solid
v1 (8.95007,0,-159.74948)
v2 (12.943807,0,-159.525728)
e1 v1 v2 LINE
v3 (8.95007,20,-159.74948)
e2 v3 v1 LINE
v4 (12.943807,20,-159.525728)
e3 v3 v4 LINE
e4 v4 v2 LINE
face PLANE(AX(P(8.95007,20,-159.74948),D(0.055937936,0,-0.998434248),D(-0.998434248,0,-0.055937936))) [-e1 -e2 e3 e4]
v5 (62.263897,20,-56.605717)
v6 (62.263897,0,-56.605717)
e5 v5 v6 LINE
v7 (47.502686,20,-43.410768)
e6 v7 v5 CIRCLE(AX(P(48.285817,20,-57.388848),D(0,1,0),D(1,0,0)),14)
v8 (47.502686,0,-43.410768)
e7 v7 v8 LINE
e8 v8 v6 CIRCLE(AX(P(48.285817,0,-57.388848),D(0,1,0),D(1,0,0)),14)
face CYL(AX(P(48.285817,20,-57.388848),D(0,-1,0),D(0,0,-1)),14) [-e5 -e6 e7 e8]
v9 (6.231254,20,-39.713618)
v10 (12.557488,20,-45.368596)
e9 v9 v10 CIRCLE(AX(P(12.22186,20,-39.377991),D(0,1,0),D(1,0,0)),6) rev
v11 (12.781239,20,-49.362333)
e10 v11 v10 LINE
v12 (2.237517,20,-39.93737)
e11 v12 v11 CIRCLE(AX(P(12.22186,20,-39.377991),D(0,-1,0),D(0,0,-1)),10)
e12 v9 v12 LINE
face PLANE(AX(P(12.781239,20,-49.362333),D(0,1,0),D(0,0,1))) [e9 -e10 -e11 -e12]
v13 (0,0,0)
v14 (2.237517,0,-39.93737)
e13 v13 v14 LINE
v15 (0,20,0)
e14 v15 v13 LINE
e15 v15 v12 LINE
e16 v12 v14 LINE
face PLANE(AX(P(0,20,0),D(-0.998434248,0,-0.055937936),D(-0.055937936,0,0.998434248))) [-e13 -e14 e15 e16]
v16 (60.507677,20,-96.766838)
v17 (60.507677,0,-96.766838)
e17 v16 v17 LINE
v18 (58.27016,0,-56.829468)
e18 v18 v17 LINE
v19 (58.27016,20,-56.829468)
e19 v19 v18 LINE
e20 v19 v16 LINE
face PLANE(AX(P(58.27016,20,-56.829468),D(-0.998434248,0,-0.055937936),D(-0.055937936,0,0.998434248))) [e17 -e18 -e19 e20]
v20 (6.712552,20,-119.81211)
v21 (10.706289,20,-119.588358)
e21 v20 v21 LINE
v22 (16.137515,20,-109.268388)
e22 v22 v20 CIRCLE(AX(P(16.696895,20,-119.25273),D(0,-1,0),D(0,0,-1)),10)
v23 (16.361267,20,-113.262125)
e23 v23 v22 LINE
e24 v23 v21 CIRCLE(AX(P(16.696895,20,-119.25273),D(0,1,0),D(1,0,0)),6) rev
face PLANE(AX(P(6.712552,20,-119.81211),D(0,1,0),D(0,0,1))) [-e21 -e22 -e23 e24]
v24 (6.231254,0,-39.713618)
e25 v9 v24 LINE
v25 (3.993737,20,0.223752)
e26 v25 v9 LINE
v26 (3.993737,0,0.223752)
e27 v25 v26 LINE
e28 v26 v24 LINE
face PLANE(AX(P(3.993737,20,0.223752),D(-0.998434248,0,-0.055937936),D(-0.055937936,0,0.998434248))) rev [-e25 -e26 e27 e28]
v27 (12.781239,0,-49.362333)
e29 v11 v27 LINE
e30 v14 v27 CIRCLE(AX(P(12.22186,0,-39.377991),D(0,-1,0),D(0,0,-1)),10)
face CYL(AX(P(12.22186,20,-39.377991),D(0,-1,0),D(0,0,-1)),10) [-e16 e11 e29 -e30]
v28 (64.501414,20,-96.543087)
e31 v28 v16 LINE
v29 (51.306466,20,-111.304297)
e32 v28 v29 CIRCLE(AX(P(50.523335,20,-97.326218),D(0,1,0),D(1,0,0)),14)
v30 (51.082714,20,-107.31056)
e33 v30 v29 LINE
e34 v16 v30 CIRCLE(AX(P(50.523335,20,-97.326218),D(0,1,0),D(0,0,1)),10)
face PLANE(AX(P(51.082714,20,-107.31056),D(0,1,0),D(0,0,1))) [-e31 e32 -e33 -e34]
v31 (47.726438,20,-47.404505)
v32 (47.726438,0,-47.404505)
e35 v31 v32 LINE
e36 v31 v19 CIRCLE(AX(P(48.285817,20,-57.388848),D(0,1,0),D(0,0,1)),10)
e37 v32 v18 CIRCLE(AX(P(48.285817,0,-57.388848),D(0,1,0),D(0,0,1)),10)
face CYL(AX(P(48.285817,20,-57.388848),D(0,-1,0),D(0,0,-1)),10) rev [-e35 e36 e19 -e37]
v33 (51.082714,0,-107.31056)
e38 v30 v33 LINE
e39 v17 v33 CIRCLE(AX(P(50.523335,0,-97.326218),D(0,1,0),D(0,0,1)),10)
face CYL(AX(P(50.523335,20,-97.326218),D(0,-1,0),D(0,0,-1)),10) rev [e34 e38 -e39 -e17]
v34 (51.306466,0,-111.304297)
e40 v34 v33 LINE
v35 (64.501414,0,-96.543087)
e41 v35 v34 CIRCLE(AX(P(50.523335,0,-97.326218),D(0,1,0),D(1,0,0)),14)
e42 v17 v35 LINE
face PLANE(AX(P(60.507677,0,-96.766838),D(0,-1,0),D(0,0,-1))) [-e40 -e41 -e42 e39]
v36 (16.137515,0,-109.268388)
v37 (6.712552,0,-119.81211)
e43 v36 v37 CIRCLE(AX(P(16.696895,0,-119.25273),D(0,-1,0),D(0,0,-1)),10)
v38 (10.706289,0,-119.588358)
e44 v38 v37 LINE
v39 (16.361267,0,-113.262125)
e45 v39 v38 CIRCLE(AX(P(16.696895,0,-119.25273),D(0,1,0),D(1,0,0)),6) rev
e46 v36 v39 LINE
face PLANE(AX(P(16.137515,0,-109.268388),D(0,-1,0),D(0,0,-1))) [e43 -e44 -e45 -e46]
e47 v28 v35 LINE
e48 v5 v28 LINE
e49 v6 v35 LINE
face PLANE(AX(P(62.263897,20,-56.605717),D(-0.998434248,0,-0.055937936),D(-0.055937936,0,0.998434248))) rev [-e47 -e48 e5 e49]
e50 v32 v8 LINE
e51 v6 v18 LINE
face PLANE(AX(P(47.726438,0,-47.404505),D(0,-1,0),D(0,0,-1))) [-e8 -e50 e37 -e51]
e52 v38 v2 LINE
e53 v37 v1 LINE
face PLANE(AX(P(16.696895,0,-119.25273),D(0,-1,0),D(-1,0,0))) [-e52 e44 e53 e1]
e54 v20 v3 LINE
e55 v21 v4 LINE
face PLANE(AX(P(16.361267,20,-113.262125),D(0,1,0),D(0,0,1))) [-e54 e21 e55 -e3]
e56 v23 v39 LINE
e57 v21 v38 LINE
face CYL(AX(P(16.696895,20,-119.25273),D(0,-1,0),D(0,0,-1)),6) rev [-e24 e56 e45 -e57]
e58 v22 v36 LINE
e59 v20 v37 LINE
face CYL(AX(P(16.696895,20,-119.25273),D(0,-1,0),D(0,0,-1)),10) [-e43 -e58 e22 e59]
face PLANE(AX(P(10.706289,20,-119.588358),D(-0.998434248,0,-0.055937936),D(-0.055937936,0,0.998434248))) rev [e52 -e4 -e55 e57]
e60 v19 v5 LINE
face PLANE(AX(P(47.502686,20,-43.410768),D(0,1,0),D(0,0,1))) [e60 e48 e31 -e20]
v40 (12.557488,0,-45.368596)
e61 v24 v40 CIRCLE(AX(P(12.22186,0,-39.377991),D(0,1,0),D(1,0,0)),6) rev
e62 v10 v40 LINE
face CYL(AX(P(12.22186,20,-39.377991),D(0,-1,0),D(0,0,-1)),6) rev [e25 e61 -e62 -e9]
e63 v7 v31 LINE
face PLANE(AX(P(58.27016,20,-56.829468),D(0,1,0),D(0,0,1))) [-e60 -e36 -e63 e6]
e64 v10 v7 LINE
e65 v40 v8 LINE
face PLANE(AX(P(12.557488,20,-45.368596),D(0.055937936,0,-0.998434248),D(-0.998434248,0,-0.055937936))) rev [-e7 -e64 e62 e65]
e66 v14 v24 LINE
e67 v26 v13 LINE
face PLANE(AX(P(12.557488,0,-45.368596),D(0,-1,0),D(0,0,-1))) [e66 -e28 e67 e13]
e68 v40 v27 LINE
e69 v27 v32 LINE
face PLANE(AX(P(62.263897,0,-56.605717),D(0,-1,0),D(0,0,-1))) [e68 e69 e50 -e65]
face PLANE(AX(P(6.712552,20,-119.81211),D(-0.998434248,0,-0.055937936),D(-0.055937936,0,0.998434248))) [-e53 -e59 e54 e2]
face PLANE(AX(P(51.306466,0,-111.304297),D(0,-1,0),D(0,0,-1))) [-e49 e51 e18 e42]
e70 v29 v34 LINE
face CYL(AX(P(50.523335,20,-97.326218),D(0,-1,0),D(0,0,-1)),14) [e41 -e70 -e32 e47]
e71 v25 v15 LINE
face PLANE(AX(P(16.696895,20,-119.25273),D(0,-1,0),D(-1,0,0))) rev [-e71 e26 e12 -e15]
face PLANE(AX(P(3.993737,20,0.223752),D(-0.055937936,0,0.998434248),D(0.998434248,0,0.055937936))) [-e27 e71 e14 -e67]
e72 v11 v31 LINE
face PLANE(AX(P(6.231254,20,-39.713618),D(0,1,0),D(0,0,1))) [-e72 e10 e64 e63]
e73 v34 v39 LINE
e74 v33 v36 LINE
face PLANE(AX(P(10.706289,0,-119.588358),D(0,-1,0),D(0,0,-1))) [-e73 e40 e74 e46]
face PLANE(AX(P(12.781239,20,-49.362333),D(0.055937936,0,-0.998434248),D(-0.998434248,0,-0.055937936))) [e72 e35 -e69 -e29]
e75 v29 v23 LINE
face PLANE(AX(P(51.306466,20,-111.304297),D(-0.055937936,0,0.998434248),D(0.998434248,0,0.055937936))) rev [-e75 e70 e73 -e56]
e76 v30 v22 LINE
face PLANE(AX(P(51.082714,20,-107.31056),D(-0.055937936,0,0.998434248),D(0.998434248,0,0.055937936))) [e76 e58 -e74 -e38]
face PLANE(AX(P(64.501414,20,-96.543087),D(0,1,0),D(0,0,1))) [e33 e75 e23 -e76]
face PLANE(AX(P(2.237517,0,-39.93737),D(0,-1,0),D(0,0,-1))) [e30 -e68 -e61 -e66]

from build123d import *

# Parameters (mm, degrees)
BASE_FLANGE2_DEPTH = 20


# Sheet-metal steps are written as plain solids
with BuildPart() as part:
    # Sketch8 → Base-Flange2 (new body)
    with BuildSketch(Plane(origin=(0, 0, 0), x_dir=(1, 0, 0), z_dir=(0, 1, 0))):
        with BuildLine():
            Line((0, 0), (2.237517434, 39.937369915))
            ThreePointArc((2.237517434, 39.937369915), (5.557404578, 46.833527767), (12.781239271, 49.362333035))
            Line((12.781239271, 49.362333035), (47.726437947, 47.40450528))
            ThreePointArc((47.726437947, 47.40450528), (54.95027264, 49.933310549), (58.270159784, 56.829468401))
            Line((58.270159784, 56.829468401), (60.507677219, 96.766838316))
            ThreePointArc((60.507677219, 96.766838316), (57.97887195, 103.990673009), (51.082714098, 107.310560153))
            Line((51.082714098, 107.310560153), (16.137515423, 109.268387908))
            ThreePointArc((16.137515423, 109.268387908), (9.241357571, 112.588275052), (6.712552303, 119.812109745))
            Line((6.712552303, 119.812109745), (8.950069737, 159.74947966))
            Line((8.950069737, 159.74947966), (12.943806728, 159.525727917))
            Line((12.943806728, 159.525727917), (10.706289294, 119.588358002))
            ThreePointArc((10.706289294, 119.588358002), (12.223572455, 115.254057186), (16.361267166, 113.262124899))
            Line((16.361267166, 113.262124899), (51.306465842, 111.304297144))
            ThreePointArc((51.306465842, 111.304297144), (60.961086834, 106.656455143), (64.50141421, 96.543086572))
            Line((64.50141421, 96.543086572), (62.263896776, 56.605716657))
            ThreePointArc((62.263896776, 56.605716657), (57.616054774, 46.951095665), (47.502686204, 43.410768289))
            Line((47.502686204, 43.410768289), (12.557487528, 45.368596044))
            ThreePointArc((12.557487528, 45.368596044), (8.223186712, 43.851312883), (6.231254426, 39.713618172))
            Line((6.231254426, 39.713618172), (3.993736992, -0.223751743))
            Line((3.993736992, -0.223751743), (0, 0))
        make_face()
    extrude(amount=BASE_FLANGE2_DEPTH)


solid = part.part
